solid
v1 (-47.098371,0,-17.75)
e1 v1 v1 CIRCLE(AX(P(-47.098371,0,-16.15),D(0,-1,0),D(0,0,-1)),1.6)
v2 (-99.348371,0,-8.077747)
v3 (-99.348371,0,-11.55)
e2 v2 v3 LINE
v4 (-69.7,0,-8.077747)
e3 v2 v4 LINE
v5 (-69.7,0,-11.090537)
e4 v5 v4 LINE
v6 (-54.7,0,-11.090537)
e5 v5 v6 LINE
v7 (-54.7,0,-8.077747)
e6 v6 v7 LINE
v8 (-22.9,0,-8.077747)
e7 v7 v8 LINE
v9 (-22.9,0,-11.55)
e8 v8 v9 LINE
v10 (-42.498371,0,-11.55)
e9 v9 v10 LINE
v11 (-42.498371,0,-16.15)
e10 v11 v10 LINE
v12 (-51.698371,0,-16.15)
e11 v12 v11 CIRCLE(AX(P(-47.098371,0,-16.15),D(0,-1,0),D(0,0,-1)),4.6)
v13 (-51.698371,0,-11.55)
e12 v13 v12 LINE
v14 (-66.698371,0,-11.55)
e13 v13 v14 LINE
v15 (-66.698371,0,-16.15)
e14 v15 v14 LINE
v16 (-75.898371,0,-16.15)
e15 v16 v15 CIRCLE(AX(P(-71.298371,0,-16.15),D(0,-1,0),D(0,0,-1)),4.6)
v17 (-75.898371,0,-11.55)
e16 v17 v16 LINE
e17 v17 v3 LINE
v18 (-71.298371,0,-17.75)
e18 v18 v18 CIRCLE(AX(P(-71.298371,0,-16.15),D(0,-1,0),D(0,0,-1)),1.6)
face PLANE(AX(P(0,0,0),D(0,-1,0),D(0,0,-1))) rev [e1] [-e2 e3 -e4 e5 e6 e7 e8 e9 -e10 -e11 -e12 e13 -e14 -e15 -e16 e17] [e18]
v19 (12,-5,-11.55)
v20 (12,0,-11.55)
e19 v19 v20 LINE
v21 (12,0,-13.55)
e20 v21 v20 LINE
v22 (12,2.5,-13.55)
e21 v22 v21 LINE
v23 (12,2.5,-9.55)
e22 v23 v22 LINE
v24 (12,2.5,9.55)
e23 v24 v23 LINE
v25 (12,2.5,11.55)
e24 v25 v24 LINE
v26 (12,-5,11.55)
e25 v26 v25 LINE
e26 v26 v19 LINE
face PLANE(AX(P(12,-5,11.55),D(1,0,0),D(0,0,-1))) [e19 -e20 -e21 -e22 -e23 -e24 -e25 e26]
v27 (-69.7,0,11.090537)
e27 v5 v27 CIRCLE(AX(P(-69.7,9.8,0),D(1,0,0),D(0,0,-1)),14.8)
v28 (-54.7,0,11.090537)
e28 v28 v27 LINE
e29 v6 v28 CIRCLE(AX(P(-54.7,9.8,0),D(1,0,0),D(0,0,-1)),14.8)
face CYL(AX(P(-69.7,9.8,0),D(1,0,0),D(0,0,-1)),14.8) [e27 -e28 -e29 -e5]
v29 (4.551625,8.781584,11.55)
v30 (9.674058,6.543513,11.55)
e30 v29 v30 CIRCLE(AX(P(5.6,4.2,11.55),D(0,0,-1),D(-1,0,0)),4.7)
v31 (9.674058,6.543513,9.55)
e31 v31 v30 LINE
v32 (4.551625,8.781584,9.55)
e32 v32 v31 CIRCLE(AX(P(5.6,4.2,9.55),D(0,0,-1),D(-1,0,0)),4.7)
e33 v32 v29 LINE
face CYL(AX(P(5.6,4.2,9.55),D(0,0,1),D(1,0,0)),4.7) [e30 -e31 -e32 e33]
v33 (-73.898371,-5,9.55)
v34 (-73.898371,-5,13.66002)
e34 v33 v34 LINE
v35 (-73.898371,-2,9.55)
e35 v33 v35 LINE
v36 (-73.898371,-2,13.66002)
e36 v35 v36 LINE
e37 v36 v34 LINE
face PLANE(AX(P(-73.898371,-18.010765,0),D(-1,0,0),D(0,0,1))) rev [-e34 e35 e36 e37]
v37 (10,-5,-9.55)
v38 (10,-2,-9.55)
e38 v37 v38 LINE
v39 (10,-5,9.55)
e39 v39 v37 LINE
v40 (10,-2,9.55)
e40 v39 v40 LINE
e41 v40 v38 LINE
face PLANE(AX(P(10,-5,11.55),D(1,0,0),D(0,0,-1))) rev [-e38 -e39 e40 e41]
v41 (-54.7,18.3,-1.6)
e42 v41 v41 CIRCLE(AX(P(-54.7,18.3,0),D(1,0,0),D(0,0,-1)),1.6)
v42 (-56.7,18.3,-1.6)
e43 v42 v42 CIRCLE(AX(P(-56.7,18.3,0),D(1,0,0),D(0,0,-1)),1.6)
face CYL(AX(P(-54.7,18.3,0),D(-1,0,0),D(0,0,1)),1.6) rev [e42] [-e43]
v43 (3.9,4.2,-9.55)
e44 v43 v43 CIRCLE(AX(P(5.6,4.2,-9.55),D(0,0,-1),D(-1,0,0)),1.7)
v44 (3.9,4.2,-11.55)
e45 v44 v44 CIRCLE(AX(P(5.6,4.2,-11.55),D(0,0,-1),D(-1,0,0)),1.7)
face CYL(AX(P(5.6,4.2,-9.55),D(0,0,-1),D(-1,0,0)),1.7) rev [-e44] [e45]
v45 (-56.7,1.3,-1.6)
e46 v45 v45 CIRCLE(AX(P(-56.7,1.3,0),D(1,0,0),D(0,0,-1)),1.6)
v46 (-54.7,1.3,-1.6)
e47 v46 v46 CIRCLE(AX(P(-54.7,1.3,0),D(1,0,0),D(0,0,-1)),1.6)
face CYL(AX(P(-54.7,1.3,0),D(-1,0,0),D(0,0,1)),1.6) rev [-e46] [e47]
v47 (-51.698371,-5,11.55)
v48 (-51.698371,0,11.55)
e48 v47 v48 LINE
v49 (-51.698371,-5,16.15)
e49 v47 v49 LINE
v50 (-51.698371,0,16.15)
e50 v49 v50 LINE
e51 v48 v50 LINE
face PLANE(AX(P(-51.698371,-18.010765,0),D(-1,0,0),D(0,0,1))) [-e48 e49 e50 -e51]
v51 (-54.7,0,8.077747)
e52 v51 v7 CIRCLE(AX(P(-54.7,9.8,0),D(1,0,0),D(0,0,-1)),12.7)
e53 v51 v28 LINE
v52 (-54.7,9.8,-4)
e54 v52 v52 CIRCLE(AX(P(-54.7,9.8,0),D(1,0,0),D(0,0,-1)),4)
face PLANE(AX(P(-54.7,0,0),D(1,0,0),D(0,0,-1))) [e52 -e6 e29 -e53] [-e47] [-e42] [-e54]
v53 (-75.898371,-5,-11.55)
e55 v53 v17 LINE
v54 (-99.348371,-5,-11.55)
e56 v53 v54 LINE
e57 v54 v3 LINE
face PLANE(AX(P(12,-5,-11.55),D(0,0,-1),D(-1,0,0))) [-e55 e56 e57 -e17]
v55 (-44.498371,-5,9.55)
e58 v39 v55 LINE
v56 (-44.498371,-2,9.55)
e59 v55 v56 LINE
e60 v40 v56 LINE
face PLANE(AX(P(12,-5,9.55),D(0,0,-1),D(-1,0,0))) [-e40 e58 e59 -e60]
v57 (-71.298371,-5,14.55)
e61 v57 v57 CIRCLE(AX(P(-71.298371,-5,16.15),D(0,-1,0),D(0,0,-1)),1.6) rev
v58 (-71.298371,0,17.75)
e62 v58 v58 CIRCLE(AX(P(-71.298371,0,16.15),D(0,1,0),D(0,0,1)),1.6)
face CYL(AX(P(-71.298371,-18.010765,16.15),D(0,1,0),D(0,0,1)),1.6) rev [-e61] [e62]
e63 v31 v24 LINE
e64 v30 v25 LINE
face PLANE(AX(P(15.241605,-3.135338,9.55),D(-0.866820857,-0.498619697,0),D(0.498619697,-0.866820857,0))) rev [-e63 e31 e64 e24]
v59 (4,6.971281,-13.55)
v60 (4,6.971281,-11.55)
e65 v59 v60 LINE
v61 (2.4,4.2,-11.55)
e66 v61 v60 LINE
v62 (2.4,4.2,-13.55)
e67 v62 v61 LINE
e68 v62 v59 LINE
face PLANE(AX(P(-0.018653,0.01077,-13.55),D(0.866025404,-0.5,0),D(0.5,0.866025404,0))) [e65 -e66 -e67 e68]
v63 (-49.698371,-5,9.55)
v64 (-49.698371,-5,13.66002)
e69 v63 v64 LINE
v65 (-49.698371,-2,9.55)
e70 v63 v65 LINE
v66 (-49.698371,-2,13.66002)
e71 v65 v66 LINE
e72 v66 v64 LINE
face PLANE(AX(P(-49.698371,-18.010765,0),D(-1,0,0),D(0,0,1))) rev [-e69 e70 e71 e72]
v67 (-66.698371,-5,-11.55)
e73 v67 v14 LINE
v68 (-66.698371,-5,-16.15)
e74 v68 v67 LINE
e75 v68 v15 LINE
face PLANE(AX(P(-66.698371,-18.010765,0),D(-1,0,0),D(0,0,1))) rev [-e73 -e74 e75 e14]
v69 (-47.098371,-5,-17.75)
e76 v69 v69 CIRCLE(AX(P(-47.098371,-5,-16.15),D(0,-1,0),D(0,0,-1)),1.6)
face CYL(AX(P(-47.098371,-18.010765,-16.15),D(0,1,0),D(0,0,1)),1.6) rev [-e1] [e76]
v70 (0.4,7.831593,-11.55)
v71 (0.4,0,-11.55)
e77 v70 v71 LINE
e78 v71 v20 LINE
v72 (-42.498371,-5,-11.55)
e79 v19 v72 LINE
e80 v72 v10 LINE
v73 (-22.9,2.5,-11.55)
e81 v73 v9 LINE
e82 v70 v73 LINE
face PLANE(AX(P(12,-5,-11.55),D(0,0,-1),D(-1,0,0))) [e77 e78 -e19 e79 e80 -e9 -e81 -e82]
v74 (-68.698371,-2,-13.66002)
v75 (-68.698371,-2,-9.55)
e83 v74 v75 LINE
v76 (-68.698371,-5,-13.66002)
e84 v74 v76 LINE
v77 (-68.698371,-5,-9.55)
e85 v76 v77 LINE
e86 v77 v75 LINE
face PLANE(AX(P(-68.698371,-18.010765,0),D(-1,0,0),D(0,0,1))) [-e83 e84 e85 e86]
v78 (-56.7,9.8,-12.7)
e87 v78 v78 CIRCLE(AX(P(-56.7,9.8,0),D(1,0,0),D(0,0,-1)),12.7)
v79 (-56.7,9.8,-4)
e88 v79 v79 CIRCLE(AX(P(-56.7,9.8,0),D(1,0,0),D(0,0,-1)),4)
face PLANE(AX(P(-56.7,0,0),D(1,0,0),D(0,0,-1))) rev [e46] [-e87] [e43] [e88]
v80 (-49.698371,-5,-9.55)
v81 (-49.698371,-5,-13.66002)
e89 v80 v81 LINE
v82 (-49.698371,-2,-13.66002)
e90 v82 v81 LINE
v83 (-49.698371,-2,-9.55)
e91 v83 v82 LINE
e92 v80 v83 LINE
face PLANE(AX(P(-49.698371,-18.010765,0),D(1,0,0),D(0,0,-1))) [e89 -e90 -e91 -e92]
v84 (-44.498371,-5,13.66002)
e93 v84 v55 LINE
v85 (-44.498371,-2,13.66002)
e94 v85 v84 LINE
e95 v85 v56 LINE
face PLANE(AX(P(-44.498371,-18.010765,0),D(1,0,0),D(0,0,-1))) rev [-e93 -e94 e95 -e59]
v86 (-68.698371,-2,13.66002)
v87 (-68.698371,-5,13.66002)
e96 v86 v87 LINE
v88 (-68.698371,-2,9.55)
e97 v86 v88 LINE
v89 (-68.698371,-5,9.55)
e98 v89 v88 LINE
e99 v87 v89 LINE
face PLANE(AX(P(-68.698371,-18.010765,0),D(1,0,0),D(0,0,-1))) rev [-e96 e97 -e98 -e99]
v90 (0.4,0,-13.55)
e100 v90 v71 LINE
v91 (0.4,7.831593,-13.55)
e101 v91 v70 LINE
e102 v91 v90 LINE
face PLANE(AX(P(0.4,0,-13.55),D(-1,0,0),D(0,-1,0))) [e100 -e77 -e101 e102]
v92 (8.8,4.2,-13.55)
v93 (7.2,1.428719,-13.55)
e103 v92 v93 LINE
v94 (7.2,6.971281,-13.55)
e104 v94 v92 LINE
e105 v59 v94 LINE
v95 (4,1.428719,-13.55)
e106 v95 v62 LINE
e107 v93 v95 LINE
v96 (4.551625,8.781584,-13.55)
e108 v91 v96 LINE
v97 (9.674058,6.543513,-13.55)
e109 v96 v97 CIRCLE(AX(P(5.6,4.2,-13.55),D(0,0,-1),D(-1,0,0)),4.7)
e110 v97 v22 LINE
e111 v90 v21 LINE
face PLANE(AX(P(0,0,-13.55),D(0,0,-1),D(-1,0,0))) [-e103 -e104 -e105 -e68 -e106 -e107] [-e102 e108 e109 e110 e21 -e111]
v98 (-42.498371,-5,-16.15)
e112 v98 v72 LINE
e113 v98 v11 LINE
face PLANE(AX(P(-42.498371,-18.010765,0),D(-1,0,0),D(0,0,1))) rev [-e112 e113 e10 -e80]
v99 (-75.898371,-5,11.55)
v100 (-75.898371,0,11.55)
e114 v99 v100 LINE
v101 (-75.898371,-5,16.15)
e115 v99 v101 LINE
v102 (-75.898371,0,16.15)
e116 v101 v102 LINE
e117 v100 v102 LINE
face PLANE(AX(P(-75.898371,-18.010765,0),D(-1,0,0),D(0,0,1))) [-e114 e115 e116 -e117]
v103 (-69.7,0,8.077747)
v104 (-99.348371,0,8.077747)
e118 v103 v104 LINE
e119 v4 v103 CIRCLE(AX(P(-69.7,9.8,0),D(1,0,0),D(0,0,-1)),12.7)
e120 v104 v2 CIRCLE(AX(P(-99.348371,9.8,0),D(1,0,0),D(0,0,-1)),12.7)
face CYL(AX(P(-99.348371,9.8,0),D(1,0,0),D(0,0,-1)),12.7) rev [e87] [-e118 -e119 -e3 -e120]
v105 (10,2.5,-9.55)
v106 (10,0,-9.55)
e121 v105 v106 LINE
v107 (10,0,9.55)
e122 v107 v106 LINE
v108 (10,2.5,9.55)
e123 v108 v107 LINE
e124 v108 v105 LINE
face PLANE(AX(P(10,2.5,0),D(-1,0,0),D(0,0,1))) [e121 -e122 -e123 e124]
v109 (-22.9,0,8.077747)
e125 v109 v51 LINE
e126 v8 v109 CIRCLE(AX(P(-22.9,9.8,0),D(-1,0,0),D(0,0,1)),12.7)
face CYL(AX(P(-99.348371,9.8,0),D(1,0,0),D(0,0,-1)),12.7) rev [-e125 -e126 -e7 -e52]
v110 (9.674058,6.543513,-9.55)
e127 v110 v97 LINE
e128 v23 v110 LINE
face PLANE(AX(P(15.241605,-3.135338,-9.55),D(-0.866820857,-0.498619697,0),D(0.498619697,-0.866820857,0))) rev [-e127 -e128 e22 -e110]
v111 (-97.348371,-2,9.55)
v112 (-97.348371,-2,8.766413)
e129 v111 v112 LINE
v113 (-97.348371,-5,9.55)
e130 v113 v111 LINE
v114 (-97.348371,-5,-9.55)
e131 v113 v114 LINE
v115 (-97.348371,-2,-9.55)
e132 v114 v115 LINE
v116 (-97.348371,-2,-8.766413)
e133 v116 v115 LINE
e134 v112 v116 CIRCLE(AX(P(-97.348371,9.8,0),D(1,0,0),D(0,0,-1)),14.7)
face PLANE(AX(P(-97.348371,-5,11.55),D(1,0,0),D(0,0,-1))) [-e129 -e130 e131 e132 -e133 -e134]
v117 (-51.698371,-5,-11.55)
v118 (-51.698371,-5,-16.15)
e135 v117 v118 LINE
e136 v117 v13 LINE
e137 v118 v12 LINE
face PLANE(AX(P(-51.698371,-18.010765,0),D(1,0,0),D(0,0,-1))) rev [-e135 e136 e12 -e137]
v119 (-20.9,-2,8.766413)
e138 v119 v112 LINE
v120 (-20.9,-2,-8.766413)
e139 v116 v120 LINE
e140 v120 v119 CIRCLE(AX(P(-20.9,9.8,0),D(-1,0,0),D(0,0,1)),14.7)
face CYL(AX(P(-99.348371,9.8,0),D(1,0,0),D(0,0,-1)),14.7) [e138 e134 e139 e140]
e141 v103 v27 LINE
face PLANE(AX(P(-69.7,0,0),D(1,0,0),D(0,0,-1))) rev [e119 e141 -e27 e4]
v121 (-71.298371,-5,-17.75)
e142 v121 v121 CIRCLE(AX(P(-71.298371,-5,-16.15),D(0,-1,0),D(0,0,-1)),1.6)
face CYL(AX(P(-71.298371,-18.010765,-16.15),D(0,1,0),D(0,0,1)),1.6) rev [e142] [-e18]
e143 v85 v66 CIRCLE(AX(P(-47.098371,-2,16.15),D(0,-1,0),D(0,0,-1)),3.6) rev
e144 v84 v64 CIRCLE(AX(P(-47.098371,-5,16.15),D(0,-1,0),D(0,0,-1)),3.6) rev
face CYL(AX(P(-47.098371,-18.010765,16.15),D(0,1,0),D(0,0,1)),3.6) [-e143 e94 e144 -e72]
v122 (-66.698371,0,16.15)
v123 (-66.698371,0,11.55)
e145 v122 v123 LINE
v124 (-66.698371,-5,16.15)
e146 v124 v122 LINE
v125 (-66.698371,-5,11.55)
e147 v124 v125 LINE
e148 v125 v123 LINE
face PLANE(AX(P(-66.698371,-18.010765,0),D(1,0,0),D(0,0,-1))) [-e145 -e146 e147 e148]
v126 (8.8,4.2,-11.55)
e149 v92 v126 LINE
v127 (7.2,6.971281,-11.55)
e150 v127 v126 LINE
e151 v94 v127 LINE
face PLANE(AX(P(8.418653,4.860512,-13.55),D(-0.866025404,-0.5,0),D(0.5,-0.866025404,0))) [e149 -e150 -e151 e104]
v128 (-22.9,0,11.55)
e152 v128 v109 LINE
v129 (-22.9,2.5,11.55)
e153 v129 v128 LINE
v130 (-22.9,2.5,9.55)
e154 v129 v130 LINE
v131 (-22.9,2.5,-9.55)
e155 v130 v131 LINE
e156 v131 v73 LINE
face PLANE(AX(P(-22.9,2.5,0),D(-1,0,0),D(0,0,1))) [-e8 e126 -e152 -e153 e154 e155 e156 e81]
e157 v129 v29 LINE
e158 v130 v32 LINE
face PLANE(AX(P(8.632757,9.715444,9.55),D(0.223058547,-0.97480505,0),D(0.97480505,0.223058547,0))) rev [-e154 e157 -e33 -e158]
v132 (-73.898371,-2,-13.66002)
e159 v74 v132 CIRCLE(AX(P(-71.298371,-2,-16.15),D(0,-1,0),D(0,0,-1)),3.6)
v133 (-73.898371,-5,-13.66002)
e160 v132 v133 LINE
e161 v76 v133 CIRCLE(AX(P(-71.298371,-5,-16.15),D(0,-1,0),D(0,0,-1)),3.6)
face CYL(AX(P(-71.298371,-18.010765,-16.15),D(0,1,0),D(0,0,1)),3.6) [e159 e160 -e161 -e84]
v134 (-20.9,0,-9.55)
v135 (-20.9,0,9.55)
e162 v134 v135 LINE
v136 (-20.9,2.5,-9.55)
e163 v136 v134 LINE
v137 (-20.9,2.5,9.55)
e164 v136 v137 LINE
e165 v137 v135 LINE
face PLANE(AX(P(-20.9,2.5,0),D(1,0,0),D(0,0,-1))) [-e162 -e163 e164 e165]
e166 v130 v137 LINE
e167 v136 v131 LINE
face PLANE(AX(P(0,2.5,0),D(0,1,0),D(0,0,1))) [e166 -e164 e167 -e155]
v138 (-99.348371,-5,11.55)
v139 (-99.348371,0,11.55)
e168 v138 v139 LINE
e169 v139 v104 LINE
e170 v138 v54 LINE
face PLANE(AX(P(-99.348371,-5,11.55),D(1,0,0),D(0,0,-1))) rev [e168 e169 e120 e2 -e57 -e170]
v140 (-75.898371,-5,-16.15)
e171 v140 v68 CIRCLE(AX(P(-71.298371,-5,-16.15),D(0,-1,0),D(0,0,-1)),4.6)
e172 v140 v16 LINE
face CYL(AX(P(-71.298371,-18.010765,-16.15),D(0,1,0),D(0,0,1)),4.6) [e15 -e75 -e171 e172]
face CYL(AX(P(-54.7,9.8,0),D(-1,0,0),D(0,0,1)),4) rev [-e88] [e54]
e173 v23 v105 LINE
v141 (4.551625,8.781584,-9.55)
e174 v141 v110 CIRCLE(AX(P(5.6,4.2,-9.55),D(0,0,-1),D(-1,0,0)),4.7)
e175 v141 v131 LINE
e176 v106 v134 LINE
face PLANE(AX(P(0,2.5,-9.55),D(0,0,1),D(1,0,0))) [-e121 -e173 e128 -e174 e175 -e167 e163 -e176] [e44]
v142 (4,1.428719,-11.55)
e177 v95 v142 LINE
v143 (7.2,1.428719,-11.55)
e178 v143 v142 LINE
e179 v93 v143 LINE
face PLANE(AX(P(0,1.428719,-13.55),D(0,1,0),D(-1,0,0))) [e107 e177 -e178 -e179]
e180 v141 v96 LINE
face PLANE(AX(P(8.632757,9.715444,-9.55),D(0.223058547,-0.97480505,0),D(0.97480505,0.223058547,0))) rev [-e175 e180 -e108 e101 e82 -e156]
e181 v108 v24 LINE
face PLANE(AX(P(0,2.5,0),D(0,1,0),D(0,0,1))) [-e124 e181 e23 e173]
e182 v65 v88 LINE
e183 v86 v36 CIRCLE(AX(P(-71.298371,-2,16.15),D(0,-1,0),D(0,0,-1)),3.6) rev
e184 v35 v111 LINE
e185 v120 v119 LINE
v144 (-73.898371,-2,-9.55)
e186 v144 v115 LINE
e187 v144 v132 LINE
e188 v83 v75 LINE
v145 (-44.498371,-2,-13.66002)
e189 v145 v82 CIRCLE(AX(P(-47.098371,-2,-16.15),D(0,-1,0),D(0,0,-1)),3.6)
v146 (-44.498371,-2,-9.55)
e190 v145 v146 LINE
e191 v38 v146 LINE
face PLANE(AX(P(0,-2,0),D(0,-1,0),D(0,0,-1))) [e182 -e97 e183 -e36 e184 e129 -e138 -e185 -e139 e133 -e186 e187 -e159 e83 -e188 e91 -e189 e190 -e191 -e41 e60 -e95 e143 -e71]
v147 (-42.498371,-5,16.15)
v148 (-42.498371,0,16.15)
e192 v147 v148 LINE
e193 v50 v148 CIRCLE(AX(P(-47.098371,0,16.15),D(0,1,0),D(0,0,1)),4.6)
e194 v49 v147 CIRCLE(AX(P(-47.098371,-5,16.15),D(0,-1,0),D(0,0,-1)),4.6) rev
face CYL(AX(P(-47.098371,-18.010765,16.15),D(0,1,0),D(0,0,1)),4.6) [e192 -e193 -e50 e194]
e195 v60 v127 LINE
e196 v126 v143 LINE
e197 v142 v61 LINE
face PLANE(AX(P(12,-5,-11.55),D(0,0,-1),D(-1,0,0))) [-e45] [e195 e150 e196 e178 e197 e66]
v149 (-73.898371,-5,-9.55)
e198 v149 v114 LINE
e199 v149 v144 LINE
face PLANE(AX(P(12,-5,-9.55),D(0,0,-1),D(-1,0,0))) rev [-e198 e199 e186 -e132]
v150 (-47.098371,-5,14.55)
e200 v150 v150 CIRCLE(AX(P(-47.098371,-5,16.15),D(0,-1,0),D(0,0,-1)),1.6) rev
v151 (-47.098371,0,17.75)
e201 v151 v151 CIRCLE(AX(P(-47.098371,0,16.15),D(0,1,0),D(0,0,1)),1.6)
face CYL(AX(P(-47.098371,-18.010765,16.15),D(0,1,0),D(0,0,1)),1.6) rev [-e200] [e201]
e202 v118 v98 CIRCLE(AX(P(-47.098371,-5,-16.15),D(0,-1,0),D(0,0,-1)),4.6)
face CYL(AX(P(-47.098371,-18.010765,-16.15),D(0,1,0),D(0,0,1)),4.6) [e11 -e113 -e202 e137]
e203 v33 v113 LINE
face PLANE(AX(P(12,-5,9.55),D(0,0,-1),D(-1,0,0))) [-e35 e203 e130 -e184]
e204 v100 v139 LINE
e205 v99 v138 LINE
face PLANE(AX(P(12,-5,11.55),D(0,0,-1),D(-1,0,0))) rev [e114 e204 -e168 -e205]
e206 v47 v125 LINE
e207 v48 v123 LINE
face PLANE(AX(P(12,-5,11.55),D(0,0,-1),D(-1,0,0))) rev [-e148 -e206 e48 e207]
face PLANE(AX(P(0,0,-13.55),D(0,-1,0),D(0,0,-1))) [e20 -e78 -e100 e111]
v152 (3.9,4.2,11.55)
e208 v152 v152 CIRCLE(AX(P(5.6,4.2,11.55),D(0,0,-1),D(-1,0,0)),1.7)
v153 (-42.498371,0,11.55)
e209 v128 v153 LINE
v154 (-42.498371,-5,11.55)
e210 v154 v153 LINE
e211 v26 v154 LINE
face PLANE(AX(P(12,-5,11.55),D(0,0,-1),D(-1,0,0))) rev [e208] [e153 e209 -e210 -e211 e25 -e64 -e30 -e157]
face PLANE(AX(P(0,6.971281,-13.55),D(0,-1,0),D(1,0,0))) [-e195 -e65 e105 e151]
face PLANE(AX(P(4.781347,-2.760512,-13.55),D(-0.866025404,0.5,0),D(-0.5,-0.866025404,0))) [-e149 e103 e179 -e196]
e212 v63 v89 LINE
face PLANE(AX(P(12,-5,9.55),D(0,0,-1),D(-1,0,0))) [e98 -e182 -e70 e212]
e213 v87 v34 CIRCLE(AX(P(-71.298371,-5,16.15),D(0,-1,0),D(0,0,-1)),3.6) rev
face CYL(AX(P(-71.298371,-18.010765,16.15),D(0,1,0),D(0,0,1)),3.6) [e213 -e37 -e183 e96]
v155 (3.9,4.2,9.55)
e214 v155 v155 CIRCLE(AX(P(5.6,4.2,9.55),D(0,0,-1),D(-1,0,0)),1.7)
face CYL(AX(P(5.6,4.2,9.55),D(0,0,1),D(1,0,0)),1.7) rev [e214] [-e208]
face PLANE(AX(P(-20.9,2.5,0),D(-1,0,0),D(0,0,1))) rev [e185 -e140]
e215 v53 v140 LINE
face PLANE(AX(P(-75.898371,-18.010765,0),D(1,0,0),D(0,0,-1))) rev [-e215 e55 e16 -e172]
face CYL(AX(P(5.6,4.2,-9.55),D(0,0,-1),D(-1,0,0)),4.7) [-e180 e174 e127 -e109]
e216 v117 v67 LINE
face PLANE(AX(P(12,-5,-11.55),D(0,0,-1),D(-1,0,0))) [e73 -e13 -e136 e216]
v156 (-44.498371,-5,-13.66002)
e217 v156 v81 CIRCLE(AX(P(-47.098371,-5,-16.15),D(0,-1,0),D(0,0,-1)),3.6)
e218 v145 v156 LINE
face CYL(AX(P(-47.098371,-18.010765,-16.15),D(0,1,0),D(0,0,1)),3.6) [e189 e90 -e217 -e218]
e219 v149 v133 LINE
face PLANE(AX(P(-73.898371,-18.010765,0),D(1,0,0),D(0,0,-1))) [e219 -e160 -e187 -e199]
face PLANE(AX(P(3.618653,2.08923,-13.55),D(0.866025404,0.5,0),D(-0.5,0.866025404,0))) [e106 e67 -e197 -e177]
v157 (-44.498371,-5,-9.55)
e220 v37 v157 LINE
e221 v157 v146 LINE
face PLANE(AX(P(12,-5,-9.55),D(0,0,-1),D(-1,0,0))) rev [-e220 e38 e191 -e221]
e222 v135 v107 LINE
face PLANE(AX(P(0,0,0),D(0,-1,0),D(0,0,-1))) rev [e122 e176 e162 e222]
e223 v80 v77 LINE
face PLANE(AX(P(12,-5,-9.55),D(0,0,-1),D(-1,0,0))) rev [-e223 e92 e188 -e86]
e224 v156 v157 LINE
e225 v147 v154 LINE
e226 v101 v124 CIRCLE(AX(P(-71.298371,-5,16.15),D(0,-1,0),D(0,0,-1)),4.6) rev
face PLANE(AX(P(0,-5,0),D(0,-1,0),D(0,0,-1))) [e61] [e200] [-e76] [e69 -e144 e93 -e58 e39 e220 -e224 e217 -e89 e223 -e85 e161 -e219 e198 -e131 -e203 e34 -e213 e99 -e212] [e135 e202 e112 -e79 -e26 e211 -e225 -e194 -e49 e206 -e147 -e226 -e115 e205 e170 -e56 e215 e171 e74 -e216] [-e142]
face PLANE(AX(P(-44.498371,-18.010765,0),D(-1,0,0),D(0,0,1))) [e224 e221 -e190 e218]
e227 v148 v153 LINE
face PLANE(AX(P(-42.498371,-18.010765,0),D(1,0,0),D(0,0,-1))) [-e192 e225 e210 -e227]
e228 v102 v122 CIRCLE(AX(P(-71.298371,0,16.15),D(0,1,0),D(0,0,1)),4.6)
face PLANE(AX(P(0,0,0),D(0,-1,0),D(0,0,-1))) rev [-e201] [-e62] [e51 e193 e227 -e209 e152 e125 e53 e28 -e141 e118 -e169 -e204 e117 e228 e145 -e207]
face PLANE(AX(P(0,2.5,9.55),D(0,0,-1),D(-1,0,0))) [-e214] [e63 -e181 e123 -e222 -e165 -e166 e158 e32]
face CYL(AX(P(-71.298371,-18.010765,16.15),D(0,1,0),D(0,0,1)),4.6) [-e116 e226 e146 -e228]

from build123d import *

# Parameters (mm, degrees)
SKETCH3_W                = 111.348371095
SKETCH3_H                = 23.1
BOSS_EXTRUDE1_DEPTH      = 5
SKETCH3_4_W              = 34.9
SKETCH3_4_H              = 23.1
BOSS_EXTRUDE2_DEPTH      = 2.5
CUT_EXTRUDE1_DEPTH       = 30.8
CUT_EXTRUDE1_DEPTH_BACK  = 67.894637304
SKETCH4_4_R              = 12.7
BOSS_EXTRUDE3_START      = -1
SKETCH4_R                = 12.7
SKETCH4_R_2              = 4
SKETCH4_R_3              = 1.6
BOSS_EXTRUDE3_DEPTH      = 2
BOSS_EXTRUDE4_DEPTH      = 2
BOSS_EXTRUDE4_DEPTH_BACK = 13
BOSS_EXTRUDE4_START      = -3
SKETCH4_3_R              = 14.8
SKETCH4_3_R_2            = 12.7
SKETCH5_R                = 4.6
SKETCH5_R_2              = 1.6
BOSS_EXTRUDE5_DEPTH      = 5
BOSS_EXTRUDE6_START      = 11.55
SKETCH6_R                = 1.7
BOSS_EXTRUDE6_DEPTH      = 2
BOSS_EXTRUDE7_START      = -11.55
BOSS_EXTRUDE7_OUTLINE_R  = 1.7
BOSS_EXTRUDE7_DEPTH      = 2
BOSS_EXTRUDE8_DEPTH      = 2
SHELL1_START             = -5
SHELL1_DEPTH             = 0.1
SHELL1_START_2           = -4.9
SHELL1_2_DEPTH           = 2.9
SHELL1_START_3           = -97.348371095
SHELL1_3_DEPTH           = 76.448371095
SHELL1_START_4           = -56.7
SHELL1_4_DEPTH           = 2
SHELL1_START_5           = -22.9
SHELL1_5_DEPTH           = 2


with BuildPart() as part:
    # Sketch3 → Boss-Extrude1 (new body)
    with BuildSketch(Plane(origin=(0, 0, 0), x_dir=(1, 0, 0), z_dir=(0, 1, 0))):
        with Locations((-43.674185548, 0)):
            Rectangle(SKETCH3_W, SKETCH3_H)
    extrude(amount=-BOSS_EXTRUDE1_DEPTH)

    # Sketch3<4> → Boss-Extrude2 (add)
    with BuildSketch(Plane(origin=(0, 0, 0), x_dir=(1, 0, 0), z_dir=(0, 1, 0))):
        with Locations((-5.45, 0)):
            Rectangle(SKETCH3_4_W, SKETCH3_4_H)
        Polygon((-20.2, 9.55), (9.3, 9.55), (10, 9.55), (10, -9.55), (9.3, -9.55), (-20.2, -9.55), (-20.9, -9.55), (-20.9, 9.55), align=None, mode=Mode.SUBTRACT)
    extrude(amount=BOSS_EXTRUDE2_DEPTH)

    # Sketch4<4> → Cut-Extrude1 (cut, two sides: drawn at the far end of the back side and taken through both)
    with BuildSketch(Plane(origin=(-53.7, 0, 0), x_dir=(0, 0, -1), z_dir=(1, 0, 0)).offset(-CUT_EXTRUDE1_DEPTH_BACK)):
        with Locations((0, 9.8)):
            Circle(SKETCH4_4_R)
    extrude(amount=CUT_EXTRUDE1_DEPTH + CUT_EXTRUDE1_DEPTH_BACK, mode=Mode.SUBTRACT)

    # Sketch4 → Boss-Extrude3 (add)
    with BuildSketch(Plane(origin=(-53.7, 0, 0), x_dir=(0, 0, -1), z_dir=(1, 0, 0)).offset(BOSS_EXTRUDE3_START)):
        with Locations((0, 9.8)):
            Circle(SKETCH4_R)
        with Locations((0, 9.8)):
            Circle(SKETCH4_R_2, mode=Mode.SUBTRACT)
        with Locations((0, 18.3)):
            Circle(SKETCH4_R_3, mode=Mode.SUBTRACT)
        with Locations((0, 1.3)):
            Circle(SKETCH4_R_3, mode=Mode.SUBTRACT)
    extrude(amount=-BOSS_EXTRUDE3_DEPTH)

    # Sketch4<3> → Boss-Extrude4 (add, two sides: drawn at the far end of the back side and taken through both)
    with BuildSketch(Plane(origin=(-53.7, 0, 0), x_dir=(0, 0, -1), z_dir=(1, 0, 0)).offset(BOSS_EXTRUDE4_START - BOSS_EXTRUDE4_DEPTH_BACK)):
        with Locations((0, 9.8)):
            Circle(SKETCH4_3_R)
        with Locations((0, 9.8)):
            Circle(SKETCH4_3_R_2, mode=Mode.SUBTRACT)
    extrude(amount=BOSS_EXTRUDE4_DEPTH + BOSS_EXTRUDE4_DEPTH_BACK)

    # Sketch5 → Boss-Extrude5 (add)
    # profile 1 of 6: a face of its own
    with BuildSketch(Plane(origin=(0, 0, 0), x_dir=(1, 0, 0), z_dir=(0, 1, 0))):
        with Locations((-47.098371095, -16.15)):
            Circle(SKETCH5_R)
        with Locations(Location((-47.098371095, -16.15, 0), (0, 0, 270))):
            Circle(SKETCH5_R_2, mode=Mode.SUBTRACT)
    # profile 2 of 6: a face of its own
    with BuildSketch(Plane(origin=(0, 0, 0), x_dir=(1, 0, 0), z_dir=(0, 1, 0))):
        with BuildLine():
            Line((-51.698371095, -11.55), (-51.698371095, -16.15))
            ThreePointArc((-51.698371095, -16.15), (-50.351062288, -12.897308807), (-47.098371095, -11.55))
            Line((-47.098371095, -11.55), (-51.698371095, -11.55))
        make_face()
    # profile 3 of 6: a face of its own
    with BuildSketch(Plane(origin=(0, 0, 0), x_dir=(1, 0, 0), z_dir=(0, 1, 0))):
        with BuildLine():
            ThreePointArc((-47.098371095, -11.55), (-43.845679901, -12.897308807), (-42.498371095, -16.15))
            Line((-42.498371095, -16.15), (-42.498371095, -11.55))
            Line((-42.498371095, -11.55), (-47.098371095, -11.55))
        make_face()
    # profile 4 of 6: a face of its own
    with BuildSketch(Plane(origin=(0, 0, 0), x_dir=(1, 0, 0), z_dir=(0, 1, 0))):
        with Locations((-71.298371095, -16.15)):
            Circle(SKETCH5_R)
        with Locations(Location((-71.298371095, -16.15, 0), (0, 0, 270))):
            Circle(SKETCH5_R_2, mode=Mode.SUBTRACT)
    # profile 5 of 6: a face of its own
    with BuildSketch(Plane(origin=(0, 0, 0), x_dir=(1, 0, 0), z_dir=(0, 1, 0))):
        with BuildLine():
            ThreePointArc((-75.898371095, -16.15), (-74.551062288, -12.897308807), (-71.298371095, -11.55))
            Line((-71.298371095, -11.55), (-75.898371095, -11.55))
            Line((-75.898371095, -11.55), (-75.898371095, -16.15))
        make_face()
    # profile 6 of 6: a face of its own
    with BuildSketch(Plane(origin=(0, 0, 0), x_dir=(1, 0, 0), z_dir=(0, 1, 0))):
        with BuildLine():
            Line((-66.698371095, -16.15), (-66.698371095, -11.55))
            Line((-66.698371095, -11.55), (-71.298371095, -11.55))
            ThreePointArc((-71.298371095, -11.55), (-68.045679901, -12.897308807), (-66.698371095, -16.15))
        make_face()
    boss_extrude5 = extrude(amount=-BOSS_EXTRUDE5_DEPTH)

    # Sketch6 → Boss-Extrude6 (add)
    with BuildSketch(Plane.XY.offset(BOSS_EXTRUDE6_START)):
        with BuildLine():
            Line((4.55162483, 8.781583733), (-22.9, 2.5))
            Line((-22.9, 2.5), (1.21821954, 2.5))
            ThreePointArc((1.21821954, 2.5), (5.6, -0.5), (9.98178046, 2.5))
            Line((9.98178046, 2.5), (12, 2.5))
            Line((12, 2.5), (9.674058028, 6.543512575))
            ThreePointArc((9.674058028, 6.543512575), (7.481735852, 8.506863149), (4.55162483, 8.781583733))
        make_face()
        with Locations(Location((5.6, 4.2, 0), (0, 0, 180))):
            Circle(SKETCH6_R, mode=Mode.SUBTRACT)
    extrude(amount=-BOSS_EXTRUDE6_DEPTH)

    # Boss-Extrude7: read off the stored shape, not the designer's step
    # Boss-Extrude7 outline → Boss-Extrude7 (add)
    with BuildSketch(Plane.XY.offset(BOSS_EXTRUDE7_START)):
        with BuildLine():
            Line((4.55162483, 8.781583733), (-22.9, 2.5))
            Line((-22.9, 2.5), (-20.9, 2.5))
            Line((-20.9, 2.5), (-20.9, 0))
            Line((-20.9, 0), (10, 0))
            Line((10, 0), (10, 2.5))
            Line((10, 2.5), (12, 2.5))
            Line((12, 2.5), (9.674058028, 6.543512575))
            ThreePointArc((9.674058028, 6.543512575), (7.481735852, 8.506863149), (4.55162483, 8.781583733))
        make_face()
        with Locations((5.6, 4.2)):
            Circle(BOSS_EXTRUDE7_OUTLINE_R, mode=Mode.SUBTRACT)
    extrude(amount=BOSS_EXTRUDE7_DEPTH)

    # Mirror1: Boss-Extrude5 across plane
    add(boss_extrude5.mirror(Plane.XY))

    # Sketch7 → Boss-Extrude8 (add)
    with BuildSketch(Plane(origin=(0, 0, -11.55), x_dir=(-1, 0, 0), z_dir=(0, 0, -1))):
        with BuildLine():
            Line((-12, 0), (-0.4, 0))
            Line((-0.4, 0), (-0.4, 7.831593371))
            Line((-0.4, 7.831593371), (-4.55162483, 8.781583733))
            ThreePointArc((-4.55162483, 8.781583733), (-7.481735852, 8.506863149), (-9.674058028, 6.543512575))
            Line((-9.674058028, 6.543512575), (-12, 2.5))
            Line((-12, 2.5), (-12, 0))
        make_face()
        Polygon((-7.2, 6.971281292), (-4, 6.971281292), (-2.4, 4.2), (-4, 1.428718708), (-7.2, 1.428718708), (-8.8, 4.2), align=None, mode=Mode.SUBTRACT)
    extrude(amount=BOSS_EXTRUDE8_DEPTH)

    # Shell1: read off the stored shape, not the designer's step
    # Shell1 outline → Shell1 (cut)
    with BuildSketch(Plane(origin=(0, 0, 0), x_dir=(1, 0, 0), z_dir=(0, 1, 0)).offset(SHELL1_START)):
        with BuildLine():
            Line((10, -9.55), (10, 9.55))
            Line((10, 9.55), (-44.498371095, 9.55))
            Line((-44.498371095, 9.55), (-44.498371095, 13.66002008))
            ThreePointArc((-44.498371095, 13.66002008), (-47.098371095, 12.55), (-49.698371095, 13.66002008))
            Line((-49.698371095, 13.66002008), (-49.698371095, 9.55))
            Line((-49.698371095, 9.55), (-68.698371095, 9.55))
            Line((-68.698371095, 9.55), (-68.698371095, 13.66002008))
            ThreePointArc((-68.698371095, 13.66002008), (-71.298371095, 12.55), (-73.898371095, 13.66002008))
            Line((-73.898371095, 13.66002008), (-73.898371095, 9.55))
            Line((-73.898371095, 9.55), (-97.348371095, 9.55))
            Line((-97.348371095, 9.55), (-97.348371095, -9.55))
            Line((-97.348371095, -9.55), (-73.898371095, -9.55))
            Line((-73.898371095, -9.55), (-73.898371095, -13.66002008))
            ThreePointArc((-73.898371095, -13.66002008), (-71.298371095, -12.55), (-68.698371095, -13.66002008))
            Line((-68.698371095, -13.66002008), (-68.698371095, -9.55))
            Line((-68.698371095, -9.55), (-49.698371095, -9.55))
            Line((-49.698371095, -9.55), (-49.698371095, -13.66002008))
            ThreePointArc((-49.698371095, -13.66002008), (-47.098371095, -12.55), (-44.498371095, -13.66002008))
            Line((-44.498371095, -13.66002008), (-44.498371095, -9.55))
            Line((-44.498371095, -9.55), (10, -9.55))
        make_face()
    extrude(amount=SHELL1_DEPTH, mode=Mode.SUBTRACT)

    # Shell1 2 outline → Shell1 2 (cut)
    with BuildSketch(Plane(origin=(0, 0, 0), x_dir=(1, 0, 0), z_dir=(0, 1, 0)).offset(SHELL1_START_2)):
        with BuildLine():
            Line((10, -9.55), (10, 9.55))
            Line((10, 9.55), (-44.498371095, 9.55))
            Line((-44.498371095, 9.55), (-44.498371095, 13.66002008))
            ThreePointArc((-44.498371095, 13.66002008), (-47.098371095, 12.55), (-49.698371095, 13.66002008))
            Line((-49.698371095, 13.66002008), (-49.698371095, 9.55))
            Line((-49.698371095, 9.55), (-68.698371095, 9.55))
            Line((-68.698371095, 9.55), (-68.698371095, 13.66002008))
            ThreePointArc((-68.698371095, 13.66002008), (-71.298371095, 12.55), (-73.898371095, 13.66002008))
            Line((-73.898371095, 13.66002008), (-73.898371095, 9.55))
            Line((-73.898371095, 9.55), (-97.348371095, 9.55))
            Line((-97.348371095, 9.55), (-97.348371095, -9.55))
            Line((-97.348371095, -9.55), (-73.898371095, -9.55))
            Line((-73.898371095, -9.55), (-73.898371095, -13.66002008))
            ThreePointArc((-73.898371095, -13.66002008), (-71.298371095, -12.55), (-68.698371095, -13.66002008))
            Line((-68.698371095, -13.66002008), (-68.698371095, -9.55))
            Line((-68.698371095, -9.55), (-49.698371095, -9.55))
            Line((-49.698371095, -9.55), (-49.698371095, -13.66002008))
            ThreePointArc((-49.698371095, -13.66002008), (-47.098371095, -12.55), (-44.498371095, -13.66002008))
            Line((-44.498371095, -13.66002008), (-44.498371095, -9.55))
            Line((-44.498371095, -9.55), (10, -9.55))
        make_face()
    extrude(amount=SHELL1_2_DEPTH, mode=Mode.SUBTRACT)

    # Shell1 3 outline → Shell1 3 (add)
    with BuildSketch(Plane.YZ.offset(SHELL1_START_3)):
        with BuildLine():
            ThreePointArc((-2, -4.695742753), (-2.9, 0), (-2, 4.695742753))
            Line((-2, 4.695742753), (-2, 8.766413178))
            ThreePointArc((-2, 8.766413178), (-4.9, 0), (-2, -8.766413178))
            Line((-2, -8.766413178), (-2, -4.695742753))
        make_face()
    extrude(amount=SHELL1_3_DEPTH)

    # Shell1 4 outline → Shell1 4 (add)
    with BuildSketch(Plane.YZ.offset(SHELL1_START_4)):
        with BuildLine():
            Line((-2, -4.695742753), (-2, 4.695742753))
            ThreePointArc((-2, 4.695742753), (-2.9, 0), (-2, -4.695742753))
        make_face()
    extrude(amount=SHELL1_4_DEPTH)

    # Shell1 5 outline → Shell1 5 (add)
    with BuildSketch(Plane.YZ.offset(SHELL1_START_5)):
        with BuildLine():
            Line((-2, -4.695742753), (-2, 4.695742753))
            ThreePointArc((-2, 4.695742753), (-2.9, 0), (-2, -4.695742753))
        make_face()
    extrude(amount=SHELL1_5_DEPTH)


solid = part.part
